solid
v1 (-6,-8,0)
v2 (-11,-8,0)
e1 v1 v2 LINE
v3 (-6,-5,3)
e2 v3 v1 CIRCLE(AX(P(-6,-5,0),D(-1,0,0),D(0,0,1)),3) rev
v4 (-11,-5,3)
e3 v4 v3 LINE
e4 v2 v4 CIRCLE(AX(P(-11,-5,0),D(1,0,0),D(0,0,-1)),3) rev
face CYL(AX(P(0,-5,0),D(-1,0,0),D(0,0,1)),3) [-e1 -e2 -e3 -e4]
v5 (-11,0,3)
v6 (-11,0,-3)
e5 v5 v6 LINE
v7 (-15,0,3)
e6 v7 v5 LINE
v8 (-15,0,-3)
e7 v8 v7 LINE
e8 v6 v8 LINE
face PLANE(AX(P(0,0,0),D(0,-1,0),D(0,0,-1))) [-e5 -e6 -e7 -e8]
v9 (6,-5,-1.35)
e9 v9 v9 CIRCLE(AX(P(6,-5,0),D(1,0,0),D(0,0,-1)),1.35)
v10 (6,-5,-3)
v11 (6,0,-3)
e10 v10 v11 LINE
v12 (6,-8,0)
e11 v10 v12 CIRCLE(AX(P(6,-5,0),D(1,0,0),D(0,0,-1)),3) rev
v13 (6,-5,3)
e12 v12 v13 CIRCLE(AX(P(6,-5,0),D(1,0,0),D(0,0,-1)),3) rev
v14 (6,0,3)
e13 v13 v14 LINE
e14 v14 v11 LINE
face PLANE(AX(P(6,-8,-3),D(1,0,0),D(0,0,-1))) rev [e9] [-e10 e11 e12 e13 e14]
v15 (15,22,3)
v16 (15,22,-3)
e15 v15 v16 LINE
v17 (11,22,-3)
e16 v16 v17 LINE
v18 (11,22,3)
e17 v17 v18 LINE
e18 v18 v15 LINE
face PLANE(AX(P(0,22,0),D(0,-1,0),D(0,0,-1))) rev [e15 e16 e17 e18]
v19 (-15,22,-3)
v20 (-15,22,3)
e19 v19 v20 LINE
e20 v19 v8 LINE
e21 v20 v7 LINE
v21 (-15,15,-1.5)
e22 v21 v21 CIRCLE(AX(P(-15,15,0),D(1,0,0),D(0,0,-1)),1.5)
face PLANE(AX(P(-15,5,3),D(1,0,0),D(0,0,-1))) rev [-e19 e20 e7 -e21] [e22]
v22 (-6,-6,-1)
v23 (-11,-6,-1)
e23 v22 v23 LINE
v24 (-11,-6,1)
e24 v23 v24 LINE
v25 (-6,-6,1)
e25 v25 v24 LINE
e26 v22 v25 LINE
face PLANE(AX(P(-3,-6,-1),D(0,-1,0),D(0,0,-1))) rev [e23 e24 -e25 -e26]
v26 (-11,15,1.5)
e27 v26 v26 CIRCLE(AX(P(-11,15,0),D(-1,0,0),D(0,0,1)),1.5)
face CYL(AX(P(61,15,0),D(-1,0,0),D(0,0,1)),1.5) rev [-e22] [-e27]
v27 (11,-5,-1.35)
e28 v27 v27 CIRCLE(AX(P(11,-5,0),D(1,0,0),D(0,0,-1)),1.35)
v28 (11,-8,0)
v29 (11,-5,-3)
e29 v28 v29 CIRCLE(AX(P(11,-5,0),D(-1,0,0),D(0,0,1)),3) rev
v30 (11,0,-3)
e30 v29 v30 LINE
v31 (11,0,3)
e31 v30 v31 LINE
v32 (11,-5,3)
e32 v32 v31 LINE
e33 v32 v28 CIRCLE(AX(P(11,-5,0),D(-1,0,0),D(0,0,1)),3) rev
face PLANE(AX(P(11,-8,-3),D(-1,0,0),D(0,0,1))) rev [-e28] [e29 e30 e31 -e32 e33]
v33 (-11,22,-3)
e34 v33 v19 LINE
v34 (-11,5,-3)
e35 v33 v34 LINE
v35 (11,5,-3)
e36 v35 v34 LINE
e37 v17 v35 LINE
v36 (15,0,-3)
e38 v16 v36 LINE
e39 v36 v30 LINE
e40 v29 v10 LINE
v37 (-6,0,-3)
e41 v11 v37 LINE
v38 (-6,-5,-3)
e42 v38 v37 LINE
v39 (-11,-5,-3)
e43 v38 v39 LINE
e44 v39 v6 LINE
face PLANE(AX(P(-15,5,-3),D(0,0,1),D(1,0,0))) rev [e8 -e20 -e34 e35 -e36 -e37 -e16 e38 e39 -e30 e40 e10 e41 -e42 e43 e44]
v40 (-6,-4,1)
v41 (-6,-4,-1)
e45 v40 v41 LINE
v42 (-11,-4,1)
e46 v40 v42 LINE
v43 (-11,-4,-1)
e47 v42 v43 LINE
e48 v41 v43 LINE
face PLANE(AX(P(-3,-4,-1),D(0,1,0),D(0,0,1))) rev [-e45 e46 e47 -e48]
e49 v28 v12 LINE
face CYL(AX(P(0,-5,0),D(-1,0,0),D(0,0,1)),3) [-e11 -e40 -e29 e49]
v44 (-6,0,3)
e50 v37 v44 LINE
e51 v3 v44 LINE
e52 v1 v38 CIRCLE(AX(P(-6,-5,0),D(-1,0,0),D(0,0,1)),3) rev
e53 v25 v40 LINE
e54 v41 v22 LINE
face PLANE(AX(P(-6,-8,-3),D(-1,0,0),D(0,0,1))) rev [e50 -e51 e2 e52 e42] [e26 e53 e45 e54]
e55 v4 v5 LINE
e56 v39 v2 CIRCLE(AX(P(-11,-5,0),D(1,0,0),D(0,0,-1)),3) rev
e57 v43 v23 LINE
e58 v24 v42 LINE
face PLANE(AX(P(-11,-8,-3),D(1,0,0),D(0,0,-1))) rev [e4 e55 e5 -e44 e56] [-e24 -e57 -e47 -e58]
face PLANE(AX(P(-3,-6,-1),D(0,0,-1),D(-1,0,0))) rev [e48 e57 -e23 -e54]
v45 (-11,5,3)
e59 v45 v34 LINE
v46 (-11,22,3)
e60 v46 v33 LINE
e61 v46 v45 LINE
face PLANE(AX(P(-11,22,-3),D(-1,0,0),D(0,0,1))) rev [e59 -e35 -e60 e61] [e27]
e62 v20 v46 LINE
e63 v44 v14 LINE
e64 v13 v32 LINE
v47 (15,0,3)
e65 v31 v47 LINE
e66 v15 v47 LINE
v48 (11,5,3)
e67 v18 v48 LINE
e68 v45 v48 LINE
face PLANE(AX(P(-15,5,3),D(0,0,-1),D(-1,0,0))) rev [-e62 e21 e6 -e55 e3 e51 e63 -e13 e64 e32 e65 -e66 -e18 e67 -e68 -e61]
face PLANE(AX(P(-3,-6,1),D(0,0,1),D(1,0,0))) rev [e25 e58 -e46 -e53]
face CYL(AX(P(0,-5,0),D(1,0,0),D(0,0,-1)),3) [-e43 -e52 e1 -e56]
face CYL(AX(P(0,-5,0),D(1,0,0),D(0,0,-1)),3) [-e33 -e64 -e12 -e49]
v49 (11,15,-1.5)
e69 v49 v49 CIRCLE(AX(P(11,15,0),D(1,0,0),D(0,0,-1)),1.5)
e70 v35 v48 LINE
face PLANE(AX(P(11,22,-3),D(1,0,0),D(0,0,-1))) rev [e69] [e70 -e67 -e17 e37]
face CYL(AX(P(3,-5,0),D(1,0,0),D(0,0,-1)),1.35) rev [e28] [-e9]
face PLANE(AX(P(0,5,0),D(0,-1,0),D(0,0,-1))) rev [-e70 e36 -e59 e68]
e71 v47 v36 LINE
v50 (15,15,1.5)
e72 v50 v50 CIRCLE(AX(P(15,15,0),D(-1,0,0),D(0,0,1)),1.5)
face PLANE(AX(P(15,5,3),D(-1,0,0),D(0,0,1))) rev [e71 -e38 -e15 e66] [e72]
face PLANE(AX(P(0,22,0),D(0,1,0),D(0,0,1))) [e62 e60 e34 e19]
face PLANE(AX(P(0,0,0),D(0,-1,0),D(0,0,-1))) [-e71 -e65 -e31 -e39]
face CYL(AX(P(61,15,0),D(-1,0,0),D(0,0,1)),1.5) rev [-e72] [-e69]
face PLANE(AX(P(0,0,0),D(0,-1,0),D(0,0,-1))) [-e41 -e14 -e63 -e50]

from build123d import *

# Parameters (mm, degrees)
SKETCH3_W           = 30
SKETCH3_H           = 6
BOSS_EXTRUDE2_DEPTH = 5
SKETCH4_W           = 4
SKETCH4_H           = 6
BOSS_EXTRUDE3_DEPTH = 17
SKETCH7_R           = 1.5
CUT_EXTRUDE2_DEPTH  = 50
SKETCH9_W           = 5
SKETCH9_H           = 6
BOSS_EXTRUDE5_DEPTH = 8
SKETCH10_R          = 1.35
CUT_EXTRUDE3_DEPTH  = 8
SKETCH11_W          = 2
SKETCH11_H          = 2
CUT_EXTRUDE4_DEPTH  = 8
FILLET2_R           = 3


with BuildPart() as part:
    # Sketch3 → Boss-Extrude2 (new body)
    with BuildSketch(Plane(origin=(0, 0, 0), x_dir=(1, 0, 0), z_dir=(0, 1, 0))):
        Rectangle(SKETCH3_W, SKETCH3_H)
    extrude(amount=BOSS_EXTRUDE2_DEPTH)

    # Sketch4 → Boss-Extrude3 (add)
    with BuildSketch(Plane(origin=(0, 5, 0), x_dir=(1, 0, 0), z_dir=(0, 1, 0))):
        with Locations((-13, 0)):
            Rectangle(SKETCH4_W, SKETCH4_H)
        with Locations((13, 0)):
            Rectangle(SKETCH4_W, SKETCH4_H)
    extrude(amount=BOSS_EXTRUDE3_DEPTH)

    # Sketch7 → Cut-Extrude2 (cut, symmetric)
    with BuildSketch(Plane.ZY.offset(-11)):
        with Locations((0, 15)):
            Circle(SKETCH7_R)
    extrude(amount=CUT_EXTRUDE2_DEPTH, both=True, mode=Mode.SUBTRACT)

    # Sketch9 → Boss-Extrude5 (add)
    with BuildSketch(Plane.XZ):
        with Locations((-8.5, 0)):
            Rectangle(SKETCH9_W, SKETCH9_H)
        with Locations((8.5, 0)):
            Rectangle(SKETCH9_W, SKETCH9_H)
    extrude(amount=BOSS_EXTRUDE5_DEPTH)

    # Sketch10 → Cut-Extrude3 (cut)
    with BuildSketch(Plane(origin=(11, 0, 0), x_dir=(0, 0, -1), z_dir=(1, 0, 0))):
        with Locations((0, -5)):
            Circle(SKETCH10_R)
    extrude(amount=-CUT_EXTRUDE3_DEPTH, mode=Mode.SUBTRACT)

    # Sketch11 → Cut-Extrude4 (cut)
    with BuildSketch(Plane.ZY.offset(11)):
        with Locations((0, -5)):
            Rectangle(SKETCH11_W, SKETCH11_H)
    extrude(amount=-CUT_EXTRUDE4_DEPTH, mode=Mode.SUBTRACT)

    # Fillet2
    fillet2_edges = [part.edges().sort_by_distance(p)[0] for p in [
        (-8.5, -8, -3),
        (8.5, -8, -3),
        (8.5, -8, 3),
        (-8.5, -8, 3),
    ]]
    fillet(fillet2_edges, radius=FILLET2_R - 0.0001)  # a hair under: the kernel refuses the full size


solid = part.part
